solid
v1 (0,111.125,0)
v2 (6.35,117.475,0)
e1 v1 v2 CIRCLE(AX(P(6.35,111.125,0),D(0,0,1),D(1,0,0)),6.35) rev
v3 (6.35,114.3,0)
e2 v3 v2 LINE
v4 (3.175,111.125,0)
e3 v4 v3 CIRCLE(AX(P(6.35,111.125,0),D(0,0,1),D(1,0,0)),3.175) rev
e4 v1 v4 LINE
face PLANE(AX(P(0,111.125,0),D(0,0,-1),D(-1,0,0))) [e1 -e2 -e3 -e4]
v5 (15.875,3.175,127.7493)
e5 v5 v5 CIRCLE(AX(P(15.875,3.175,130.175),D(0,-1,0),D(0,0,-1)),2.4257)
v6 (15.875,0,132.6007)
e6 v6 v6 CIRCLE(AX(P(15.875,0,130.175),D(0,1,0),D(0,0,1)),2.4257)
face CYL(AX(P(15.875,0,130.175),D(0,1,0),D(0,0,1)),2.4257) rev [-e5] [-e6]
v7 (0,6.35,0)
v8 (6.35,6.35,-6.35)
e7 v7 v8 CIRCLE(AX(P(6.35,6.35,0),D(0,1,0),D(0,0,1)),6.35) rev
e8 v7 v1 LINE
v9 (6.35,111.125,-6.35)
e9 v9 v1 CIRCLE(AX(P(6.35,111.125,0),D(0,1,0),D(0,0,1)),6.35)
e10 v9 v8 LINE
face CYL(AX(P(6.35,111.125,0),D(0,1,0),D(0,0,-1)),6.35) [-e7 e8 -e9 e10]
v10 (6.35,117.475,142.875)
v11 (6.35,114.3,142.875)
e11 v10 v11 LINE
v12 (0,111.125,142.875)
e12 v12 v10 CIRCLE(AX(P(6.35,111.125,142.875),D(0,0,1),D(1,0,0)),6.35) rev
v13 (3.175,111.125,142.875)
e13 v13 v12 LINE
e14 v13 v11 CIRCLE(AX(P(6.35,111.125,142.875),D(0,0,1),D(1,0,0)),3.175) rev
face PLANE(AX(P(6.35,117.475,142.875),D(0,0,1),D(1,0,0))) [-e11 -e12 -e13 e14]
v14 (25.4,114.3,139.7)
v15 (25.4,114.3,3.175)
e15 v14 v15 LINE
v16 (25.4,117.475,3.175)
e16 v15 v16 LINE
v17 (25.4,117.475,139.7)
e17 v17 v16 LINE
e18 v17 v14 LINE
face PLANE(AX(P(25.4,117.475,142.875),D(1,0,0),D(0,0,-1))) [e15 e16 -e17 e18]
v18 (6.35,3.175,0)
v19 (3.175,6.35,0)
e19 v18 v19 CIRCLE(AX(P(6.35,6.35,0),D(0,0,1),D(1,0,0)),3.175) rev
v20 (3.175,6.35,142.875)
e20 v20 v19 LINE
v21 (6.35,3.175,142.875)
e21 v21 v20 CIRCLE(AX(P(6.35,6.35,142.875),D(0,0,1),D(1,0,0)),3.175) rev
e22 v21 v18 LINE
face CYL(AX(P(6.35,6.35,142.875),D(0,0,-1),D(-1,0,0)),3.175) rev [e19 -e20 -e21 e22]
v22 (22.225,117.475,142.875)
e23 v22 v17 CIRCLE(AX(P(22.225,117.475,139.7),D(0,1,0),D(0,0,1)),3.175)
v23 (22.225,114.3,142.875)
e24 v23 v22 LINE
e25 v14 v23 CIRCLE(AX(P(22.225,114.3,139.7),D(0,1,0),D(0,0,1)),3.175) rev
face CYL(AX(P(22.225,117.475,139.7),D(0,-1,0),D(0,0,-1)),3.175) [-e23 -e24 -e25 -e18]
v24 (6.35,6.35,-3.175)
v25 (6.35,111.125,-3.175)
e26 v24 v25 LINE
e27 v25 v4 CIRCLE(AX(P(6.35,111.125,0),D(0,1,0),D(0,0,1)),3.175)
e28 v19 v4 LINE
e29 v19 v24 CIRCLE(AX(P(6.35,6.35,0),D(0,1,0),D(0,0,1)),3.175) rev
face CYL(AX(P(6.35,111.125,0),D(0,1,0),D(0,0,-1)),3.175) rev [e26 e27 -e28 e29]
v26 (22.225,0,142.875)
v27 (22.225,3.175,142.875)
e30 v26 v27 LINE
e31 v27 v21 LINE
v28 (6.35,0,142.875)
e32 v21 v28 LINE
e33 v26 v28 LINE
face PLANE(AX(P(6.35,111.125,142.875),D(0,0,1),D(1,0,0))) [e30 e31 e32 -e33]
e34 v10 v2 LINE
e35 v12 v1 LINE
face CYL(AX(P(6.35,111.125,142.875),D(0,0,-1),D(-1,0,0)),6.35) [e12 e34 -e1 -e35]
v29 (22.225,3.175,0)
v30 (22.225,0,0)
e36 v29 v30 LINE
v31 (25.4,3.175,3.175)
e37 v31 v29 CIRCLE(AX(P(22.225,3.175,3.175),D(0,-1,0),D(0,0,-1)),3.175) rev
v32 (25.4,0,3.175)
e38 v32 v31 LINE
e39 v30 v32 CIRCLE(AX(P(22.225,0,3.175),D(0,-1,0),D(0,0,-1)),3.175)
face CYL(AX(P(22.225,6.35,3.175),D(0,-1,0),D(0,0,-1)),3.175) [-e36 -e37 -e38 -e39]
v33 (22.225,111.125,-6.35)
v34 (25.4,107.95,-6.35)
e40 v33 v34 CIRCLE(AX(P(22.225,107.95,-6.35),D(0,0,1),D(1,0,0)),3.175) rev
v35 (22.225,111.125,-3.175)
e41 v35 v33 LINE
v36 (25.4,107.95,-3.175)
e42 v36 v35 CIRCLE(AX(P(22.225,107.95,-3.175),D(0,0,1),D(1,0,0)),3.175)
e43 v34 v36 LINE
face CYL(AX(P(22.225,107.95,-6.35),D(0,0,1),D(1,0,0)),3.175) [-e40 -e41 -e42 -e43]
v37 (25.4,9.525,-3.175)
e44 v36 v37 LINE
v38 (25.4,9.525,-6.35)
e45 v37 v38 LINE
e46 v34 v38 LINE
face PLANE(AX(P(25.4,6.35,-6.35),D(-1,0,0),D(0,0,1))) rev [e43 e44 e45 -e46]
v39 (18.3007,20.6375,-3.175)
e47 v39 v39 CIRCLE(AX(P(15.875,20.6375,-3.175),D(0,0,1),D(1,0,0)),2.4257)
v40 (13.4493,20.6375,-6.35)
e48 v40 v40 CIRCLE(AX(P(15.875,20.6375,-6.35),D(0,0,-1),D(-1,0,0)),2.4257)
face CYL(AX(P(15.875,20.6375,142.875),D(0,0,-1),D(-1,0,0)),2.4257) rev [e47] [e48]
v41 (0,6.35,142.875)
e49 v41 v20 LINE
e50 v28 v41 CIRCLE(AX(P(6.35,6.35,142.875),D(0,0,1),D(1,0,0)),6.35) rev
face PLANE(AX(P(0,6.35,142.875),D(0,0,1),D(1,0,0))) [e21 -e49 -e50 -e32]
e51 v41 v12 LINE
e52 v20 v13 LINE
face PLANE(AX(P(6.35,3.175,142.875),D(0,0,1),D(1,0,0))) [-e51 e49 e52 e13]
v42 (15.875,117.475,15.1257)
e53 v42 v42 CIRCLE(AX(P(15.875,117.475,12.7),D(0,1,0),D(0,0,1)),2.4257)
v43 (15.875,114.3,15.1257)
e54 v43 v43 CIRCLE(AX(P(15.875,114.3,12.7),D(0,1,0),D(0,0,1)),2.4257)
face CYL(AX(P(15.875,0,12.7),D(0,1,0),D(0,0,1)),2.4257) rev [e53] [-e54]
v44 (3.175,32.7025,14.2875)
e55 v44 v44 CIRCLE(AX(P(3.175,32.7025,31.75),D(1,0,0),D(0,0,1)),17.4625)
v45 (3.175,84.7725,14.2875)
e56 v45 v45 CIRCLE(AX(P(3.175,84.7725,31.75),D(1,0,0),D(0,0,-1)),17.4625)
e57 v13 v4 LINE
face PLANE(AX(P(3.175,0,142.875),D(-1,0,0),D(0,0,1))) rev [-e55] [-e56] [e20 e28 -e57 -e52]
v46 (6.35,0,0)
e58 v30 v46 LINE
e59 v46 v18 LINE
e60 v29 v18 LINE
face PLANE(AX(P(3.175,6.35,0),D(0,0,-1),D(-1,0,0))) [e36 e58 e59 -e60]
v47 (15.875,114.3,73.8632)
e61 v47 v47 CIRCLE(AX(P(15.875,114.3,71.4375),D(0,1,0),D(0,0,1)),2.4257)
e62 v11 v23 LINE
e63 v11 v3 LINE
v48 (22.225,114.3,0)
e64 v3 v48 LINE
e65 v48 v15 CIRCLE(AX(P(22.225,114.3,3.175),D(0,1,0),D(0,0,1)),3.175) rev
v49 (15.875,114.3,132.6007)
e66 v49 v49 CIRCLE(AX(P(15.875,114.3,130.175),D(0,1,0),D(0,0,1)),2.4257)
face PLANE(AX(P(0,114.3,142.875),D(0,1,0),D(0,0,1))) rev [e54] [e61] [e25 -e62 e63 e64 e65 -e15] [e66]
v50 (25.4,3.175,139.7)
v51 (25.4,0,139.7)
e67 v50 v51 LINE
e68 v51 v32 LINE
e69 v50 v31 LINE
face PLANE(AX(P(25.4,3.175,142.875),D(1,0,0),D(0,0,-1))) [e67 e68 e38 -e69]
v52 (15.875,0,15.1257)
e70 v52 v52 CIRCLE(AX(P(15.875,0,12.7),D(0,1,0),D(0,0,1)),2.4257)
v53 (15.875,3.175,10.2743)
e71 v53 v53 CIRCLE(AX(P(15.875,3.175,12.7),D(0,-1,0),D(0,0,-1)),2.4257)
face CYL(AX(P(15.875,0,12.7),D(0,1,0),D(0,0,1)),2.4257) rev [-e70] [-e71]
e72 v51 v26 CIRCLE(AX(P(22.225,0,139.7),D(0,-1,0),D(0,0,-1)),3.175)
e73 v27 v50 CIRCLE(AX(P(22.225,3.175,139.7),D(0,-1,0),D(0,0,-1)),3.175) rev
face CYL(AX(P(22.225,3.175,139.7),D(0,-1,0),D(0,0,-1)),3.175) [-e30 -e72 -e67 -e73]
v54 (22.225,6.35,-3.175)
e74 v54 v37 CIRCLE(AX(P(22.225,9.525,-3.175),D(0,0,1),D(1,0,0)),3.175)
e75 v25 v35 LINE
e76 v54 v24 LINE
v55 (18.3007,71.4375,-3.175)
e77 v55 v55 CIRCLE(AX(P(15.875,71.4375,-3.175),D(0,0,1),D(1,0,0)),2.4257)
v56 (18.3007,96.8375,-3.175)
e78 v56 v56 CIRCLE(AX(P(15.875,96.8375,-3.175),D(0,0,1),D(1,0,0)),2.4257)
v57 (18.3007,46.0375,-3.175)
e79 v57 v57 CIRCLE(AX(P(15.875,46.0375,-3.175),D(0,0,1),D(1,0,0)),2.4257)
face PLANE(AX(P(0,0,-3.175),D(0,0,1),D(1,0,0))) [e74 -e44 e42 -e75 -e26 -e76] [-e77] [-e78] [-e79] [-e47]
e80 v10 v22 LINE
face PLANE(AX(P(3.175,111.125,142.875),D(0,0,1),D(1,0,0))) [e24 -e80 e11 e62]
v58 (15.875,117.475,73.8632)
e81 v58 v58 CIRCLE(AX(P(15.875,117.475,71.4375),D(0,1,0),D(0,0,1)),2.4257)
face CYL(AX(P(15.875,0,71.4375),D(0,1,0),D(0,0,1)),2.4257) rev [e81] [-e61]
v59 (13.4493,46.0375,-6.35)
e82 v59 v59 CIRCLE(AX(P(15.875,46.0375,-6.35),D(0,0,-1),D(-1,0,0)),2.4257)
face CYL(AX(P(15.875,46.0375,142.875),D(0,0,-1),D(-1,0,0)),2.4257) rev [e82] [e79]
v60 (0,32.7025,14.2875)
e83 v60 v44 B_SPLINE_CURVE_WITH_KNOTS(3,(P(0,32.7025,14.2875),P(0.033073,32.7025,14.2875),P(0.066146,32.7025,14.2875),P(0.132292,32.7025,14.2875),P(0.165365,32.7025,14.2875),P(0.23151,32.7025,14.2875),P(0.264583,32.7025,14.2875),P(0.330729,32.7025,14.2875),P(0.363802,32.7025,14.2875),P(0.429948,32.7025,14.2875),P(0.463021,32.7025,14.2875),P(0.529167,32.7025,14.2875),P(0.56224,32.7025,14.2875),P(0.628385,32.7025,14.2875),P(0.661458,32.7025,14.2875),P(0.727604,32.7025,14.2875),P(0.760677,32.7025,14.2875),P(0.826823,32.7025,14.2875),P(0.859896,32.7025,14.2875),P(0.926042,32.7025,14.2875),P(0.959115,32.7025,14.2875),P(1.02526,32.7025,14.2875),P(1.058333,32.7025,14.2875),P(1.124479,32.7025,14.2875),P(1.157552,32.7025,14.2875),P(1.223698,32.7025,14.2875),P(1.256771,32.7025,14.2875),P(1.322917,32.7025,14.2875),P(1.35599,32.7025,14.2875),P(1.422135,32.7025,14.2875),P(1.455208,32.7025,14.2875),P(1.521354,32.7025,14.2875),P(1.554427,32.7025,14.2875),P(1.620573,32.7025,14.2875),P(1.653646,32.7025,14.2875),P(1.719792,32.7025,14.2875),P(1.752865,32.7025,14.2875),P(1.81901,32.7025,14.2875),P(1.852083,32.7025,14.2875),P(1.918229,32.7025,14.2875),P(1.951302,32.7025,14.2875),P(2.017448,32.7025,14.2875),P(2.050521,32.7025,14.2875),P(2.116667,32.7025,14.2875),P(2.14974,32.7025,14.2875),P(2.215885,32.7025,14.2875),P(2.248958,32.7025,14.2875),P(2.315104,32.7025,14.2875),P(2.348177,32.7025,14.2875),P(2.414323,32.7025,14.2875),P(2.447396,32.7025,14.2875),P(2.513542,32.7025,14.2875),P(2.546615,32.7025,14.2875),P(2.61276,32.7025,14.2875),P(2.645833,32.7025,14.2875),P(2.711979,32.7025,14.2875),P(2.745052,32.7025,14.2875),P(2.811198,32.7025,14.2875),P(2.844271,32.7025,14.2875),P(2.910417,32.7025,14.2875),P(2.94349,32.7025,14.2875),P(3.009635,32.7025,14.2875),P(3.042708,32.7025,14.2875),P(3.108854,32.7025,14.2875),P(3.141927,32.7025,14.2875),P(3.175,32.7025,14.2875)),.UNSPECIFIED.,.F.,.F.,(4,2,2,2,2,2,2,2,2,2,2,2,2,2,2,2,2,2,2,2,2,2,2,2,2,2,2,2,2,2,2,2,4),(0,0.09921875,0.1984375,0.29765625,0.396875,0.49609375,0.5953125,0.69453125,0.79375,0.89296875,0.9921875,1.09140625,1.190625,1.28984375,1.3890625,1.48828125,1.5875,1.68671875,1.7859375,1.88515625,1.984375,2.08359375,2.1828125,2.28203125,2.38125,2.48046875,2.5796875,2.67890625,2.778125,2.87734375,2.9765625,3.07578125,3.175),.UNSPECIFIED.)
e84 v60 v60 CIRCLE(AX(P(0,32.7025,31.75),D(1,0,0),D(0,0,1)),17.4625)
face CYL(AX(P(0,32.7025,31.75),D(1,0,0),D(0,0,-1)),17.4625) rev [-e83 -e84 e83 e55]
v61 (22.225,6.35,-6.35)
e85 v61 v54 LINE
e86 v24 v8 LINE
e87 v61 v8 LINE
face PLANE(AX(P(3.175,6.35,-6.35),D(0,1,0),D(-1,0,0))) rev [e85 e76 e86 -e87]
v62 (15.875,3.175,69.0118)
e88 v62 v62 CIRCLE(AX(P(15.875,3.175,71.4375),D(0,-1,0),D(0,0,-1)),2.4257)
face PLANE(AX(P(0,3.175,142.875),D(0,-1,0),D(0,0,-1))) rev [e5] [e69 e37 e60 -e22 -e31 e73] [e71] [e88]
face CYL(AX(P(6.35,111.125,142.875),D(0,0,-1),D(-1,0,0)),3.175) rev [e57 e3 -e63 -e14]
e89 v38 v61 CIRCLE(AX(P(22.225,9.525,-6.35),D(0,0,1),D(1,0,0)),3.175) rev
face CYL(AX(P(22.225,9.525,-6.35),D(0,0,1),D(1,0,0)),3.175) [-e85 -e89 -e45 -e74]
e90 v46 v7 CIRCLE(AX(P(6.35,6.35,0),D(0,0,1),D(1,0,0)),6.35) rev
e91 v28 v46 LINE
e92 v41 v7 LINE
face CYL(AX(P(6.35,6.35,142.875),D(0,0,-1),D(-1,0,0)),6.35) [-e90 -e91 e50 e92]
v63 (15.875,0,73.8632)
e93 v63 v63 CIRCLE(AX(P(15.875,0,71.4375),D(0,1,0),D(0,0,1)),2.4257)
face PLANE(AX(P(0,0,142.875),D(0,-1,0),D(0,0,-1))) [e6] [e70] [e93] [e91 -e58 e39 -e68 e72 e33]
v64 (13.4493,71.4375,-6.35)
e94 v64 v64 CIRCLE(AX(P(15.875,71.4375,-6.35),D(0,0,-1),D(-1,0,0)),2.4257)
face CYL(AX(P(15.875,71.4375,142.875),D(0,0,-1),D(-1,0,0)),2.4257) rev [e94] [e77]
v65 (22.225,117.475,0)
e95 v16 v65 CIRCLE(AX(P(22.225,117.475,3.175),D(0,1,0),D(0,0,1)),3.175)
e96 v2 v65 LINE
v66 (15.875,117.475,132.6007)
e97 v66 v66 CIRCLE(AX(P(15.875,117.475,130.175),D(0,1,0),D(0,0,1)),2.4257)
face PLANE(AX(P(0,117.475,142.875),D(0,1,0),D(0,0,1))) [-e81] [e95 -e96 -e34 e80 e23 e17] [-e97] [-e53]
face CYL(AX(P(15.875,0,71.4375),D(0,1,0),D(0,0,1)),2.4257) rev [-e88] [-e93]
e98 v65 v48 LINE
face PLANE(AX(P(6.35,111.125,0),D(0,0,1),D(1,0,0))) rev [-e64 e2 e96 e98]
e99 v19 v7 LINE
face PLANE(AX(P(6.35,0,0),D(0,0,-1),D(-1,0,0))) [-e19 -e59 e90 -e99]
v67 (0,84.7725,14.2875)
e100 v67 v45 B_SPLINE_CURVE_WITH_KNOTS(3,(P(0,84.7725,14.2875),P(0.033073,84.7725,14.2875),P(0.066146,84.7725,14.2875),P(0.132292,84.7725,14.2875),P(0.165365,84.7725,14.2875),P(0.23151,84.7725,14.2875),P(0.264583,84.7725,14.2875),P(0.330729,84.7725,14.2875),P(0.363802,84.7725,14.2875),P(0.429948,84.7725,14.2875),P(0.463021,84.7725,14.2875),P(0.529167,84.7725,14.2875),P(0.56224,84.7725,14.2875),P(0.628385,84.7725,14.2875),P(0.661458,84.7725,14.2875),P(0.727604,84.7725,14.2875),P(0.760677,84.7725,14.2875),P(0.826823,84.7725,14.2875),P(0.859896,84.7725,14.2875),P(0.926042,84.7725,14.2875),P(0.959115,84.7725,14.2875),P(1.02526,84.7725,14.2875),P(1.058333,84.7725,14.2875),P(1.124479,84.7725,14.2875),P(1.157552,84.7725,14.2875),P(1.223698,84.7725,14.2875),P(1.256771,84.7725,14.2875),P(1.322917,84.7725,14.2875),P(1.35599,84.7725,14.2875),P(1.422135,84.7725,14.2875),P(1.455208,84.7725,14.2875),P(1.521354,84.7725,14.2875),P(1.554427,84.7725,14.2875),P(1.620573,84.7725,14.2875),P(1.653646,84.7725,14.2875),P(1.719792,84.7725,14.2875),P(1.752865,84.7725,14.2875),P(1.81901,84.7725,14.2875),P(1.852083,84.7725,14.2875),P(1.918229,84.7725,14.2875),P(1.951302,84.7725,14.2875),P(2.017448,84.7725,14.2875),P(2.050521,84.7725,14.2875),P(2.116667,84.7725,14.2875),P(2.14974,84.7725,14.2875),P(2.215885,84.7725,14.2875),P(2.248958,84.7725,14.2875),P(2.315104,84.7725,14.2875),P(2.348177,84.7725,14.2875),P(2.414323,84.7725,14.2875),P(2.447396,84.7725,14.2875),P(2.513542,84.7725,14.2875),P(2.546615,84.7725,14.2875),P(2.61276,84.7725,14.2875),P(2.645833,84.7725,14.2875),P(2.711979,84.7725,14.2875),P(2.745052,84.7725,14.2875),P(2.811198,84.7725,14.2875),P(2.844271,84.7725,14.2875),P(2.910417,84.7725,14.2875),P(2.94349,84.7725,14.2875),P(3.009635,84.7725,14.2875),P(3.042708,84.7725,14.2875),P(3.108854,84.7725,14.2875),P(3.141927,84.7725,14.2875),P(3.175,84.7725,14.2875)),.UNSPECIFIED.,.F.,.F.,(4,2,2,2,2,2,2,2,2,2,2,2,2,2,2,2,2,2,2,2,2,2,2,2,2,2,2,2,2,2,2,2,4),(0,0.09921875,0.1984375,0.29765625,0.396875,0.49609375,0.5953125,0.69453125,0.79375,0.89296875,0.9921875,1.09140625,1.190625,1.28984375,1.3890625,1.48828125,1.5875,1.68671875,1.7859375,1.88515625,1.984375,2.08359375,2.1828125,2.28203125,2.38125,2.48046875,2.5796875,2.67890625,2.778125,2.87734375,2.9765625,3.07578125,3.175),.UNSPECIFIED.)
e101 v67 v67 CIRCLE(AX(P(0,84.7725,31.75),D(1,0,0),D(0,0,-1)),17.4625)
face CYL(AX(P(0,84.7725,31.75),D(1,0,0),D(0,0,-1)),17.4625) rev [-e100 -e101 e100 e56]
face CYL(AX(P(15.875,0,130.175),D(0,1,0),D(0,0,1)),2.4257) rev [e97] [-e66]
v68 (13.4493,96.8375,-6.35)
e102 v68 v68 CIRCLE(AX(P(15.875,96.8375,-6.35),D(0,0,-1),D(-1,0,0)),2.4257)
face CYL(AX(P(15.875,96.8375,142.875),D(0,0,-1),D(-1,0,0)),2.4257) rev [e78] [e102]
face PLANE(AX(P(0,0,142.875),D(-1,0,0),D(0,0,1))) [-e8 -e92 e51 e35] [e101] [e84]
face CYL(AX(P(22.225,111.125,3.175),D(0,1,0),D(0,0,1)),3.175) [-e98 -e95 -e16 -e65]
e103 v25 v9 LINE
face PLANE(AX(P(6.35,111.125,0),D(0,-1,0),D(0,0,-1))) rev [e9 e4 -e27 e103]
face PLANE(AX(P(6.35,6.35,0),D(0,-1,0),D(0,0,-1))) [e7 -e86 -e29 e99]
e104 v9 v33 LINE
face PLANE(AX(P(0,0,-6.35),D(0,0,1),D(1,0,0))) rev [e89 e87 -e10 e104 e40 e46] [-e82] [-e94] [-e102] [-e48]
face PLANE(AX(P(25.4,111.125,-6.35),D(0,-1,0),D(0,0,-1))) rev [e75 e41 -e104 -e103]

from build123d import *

# Parameters (mm, degrees)
BASE_FLANGE1_DEPTH = 142.875
EDGE_FLANGE1_DEPTH = 104.775
SKETCH9_R          = 17.4625
CUT_EXTRUDE1_DEPTH = 187.299736648
SKETCH10_R         = 2.4257
CUT_EXTRUDE2_DEPTH = 187.705118435
SKETCH11_R         = 2.4257
CUT_EXTRUDE3_DEPTH = 192.608027624
FILLET1_R          = 3.175


# Sheet-metal steps are written as plain solids
with BuildPart() as part:
    # Sketch1 → Base-Flange1 (new body)
    with BuildSketch(Plane.XY):
        with BuildLine():
            Line((25.4, 117.475), (6.35, 117.475))
            ThreePointArc((6.35, 117.475), (1.859871939, 115.615128061), (0, 111.125))
            Line((0, 111.125), (0, 6.35))
            ThreePointArc((0, 6.35), (1.859871939, 1.859871939), (6.35, 0))
            Line((6.35, 0), (25.4, 0))
            Line((25.4, 0), (25.4, 3.175))
            Line((25.4, 3.175), (6.35, 3.175))
            ThreePointArc((6.35, 3.175), (4.10493597, 4.10493597), (3.175, 6.35))
            Line((3.175, 6.35), (3.175, 111.125))
            ThreePointArc((3.175, 111.125), (4.10493597, 113.37006403), (6.35, 114.3))
            Line((6.35, 114.3), (25.4, 114.3))
            Line((25.4, 114.3), (25.4, 117.475))
        make_face()
    extrude(amount=BASE_FLANGE1_DEPTH)

    # Edge-Flange1 section (across the edge) → Edge-Flange1 (add)
    with BuildSketch(Plane(origin=(3.175, 6.35, -3.175), x_dir=(0, 0, 1), z_dir=(0, 1, 0))):
        with BuildLine():
            Line((-3.175, 3.175), (-3.175, 22.225))
            Line((-3.175, 22.225), (0, 22.225))
            Line((0, 22.225), (0, 3.175))
            ThreePointArc((0, 3.175), (0.92993597, 0.92993597), (3.175, 0))
            Line((3.175, 0), (3.175, -3.175))
            ThreePointArc((3.175, -3.175), (-1.315128061, -1.315128061), (-3.175, 3.175))
        make_face()
    extrude(amount=EDGE_FLANGE1_DEPTH)

    # Sketch9 → Cut-Extrude1 (cut, through all)
    with BuildSketch(Plane(origin=(3.175, 0, 0), x_dir=(0, 0, -1), z_dir=(1, 0, 0))):
        with Locations((-31.75, 84.7725)):
            Circle(SKETCH9_R)
        with Locations((-31.75, 32.7025)):
            Circle(SKETCH9_R)
    extrude(amount=-CUT_EXTRUDE1_DEPTH, mode=Mode.SUBTRACT)

    # Sketch10 → Cut-Extrude2 (cut, through all)
    with BuildSketch(Plane(origin=(0, 117.475, 0), x_dir=(1, 0, 0), z_dir=(0, 1, 0))):
        with Locations(Location((15.875, -71.4375, 0), (0, 0, 270))):
            Circle(SKETCH10_R)
        with Locations(Location((15.875, -130.175, 0), (0, 0, 270))):
            Circle(SKETCH10_R)
        with Locations(Location((15.875, -12.7, 0), (0, 0, 270))):
            Circle(SKETCH10_R)
    extrude(amount=-CUT_EXTRUDE2_DEPTH, mode=Mode.SUBTRACT)

    # Sketch11 → Cut-Extrude3 (cut, through all)
    with BuildSketch(Plane(origin=(0, 0, -6.35), x_dir=(-1, 0, 0), z_dir=(0, 0, -1))):
        with Locations((-15.875, 20.6375)):
            Circle(SKETCH11_R)
        with Locations((-15.875, 96.8375)):
            Circle(SKETCH11_R)
        with Locations((-15.875, 71.4375)):
            Circle(SKETCH11_R)
        with Locations((-15.875, 46.0375)):
            Circle(SKETCH11_R)
    extrude(amount=-CUT_EXTRUDE3_DEPTH, mode=Mode.SUBTRACT)

    # Fillet1
    fillet1_edges = [part.edges().sort_by_distance(p)[0] for p in [
        (25.4, 1.5875, 0),
        (25.4, 115.8875, 0),
        (25.4, 1.5875, 142.875),
        (25.4, 6.35, -4.7625),
        (25.4, 111.125, -4.7625),
        (25.4, 115.8875, 142.875),
    ]]
    fillet(fillet1_edges, radius=FILLET1_R)


solid = part.part
